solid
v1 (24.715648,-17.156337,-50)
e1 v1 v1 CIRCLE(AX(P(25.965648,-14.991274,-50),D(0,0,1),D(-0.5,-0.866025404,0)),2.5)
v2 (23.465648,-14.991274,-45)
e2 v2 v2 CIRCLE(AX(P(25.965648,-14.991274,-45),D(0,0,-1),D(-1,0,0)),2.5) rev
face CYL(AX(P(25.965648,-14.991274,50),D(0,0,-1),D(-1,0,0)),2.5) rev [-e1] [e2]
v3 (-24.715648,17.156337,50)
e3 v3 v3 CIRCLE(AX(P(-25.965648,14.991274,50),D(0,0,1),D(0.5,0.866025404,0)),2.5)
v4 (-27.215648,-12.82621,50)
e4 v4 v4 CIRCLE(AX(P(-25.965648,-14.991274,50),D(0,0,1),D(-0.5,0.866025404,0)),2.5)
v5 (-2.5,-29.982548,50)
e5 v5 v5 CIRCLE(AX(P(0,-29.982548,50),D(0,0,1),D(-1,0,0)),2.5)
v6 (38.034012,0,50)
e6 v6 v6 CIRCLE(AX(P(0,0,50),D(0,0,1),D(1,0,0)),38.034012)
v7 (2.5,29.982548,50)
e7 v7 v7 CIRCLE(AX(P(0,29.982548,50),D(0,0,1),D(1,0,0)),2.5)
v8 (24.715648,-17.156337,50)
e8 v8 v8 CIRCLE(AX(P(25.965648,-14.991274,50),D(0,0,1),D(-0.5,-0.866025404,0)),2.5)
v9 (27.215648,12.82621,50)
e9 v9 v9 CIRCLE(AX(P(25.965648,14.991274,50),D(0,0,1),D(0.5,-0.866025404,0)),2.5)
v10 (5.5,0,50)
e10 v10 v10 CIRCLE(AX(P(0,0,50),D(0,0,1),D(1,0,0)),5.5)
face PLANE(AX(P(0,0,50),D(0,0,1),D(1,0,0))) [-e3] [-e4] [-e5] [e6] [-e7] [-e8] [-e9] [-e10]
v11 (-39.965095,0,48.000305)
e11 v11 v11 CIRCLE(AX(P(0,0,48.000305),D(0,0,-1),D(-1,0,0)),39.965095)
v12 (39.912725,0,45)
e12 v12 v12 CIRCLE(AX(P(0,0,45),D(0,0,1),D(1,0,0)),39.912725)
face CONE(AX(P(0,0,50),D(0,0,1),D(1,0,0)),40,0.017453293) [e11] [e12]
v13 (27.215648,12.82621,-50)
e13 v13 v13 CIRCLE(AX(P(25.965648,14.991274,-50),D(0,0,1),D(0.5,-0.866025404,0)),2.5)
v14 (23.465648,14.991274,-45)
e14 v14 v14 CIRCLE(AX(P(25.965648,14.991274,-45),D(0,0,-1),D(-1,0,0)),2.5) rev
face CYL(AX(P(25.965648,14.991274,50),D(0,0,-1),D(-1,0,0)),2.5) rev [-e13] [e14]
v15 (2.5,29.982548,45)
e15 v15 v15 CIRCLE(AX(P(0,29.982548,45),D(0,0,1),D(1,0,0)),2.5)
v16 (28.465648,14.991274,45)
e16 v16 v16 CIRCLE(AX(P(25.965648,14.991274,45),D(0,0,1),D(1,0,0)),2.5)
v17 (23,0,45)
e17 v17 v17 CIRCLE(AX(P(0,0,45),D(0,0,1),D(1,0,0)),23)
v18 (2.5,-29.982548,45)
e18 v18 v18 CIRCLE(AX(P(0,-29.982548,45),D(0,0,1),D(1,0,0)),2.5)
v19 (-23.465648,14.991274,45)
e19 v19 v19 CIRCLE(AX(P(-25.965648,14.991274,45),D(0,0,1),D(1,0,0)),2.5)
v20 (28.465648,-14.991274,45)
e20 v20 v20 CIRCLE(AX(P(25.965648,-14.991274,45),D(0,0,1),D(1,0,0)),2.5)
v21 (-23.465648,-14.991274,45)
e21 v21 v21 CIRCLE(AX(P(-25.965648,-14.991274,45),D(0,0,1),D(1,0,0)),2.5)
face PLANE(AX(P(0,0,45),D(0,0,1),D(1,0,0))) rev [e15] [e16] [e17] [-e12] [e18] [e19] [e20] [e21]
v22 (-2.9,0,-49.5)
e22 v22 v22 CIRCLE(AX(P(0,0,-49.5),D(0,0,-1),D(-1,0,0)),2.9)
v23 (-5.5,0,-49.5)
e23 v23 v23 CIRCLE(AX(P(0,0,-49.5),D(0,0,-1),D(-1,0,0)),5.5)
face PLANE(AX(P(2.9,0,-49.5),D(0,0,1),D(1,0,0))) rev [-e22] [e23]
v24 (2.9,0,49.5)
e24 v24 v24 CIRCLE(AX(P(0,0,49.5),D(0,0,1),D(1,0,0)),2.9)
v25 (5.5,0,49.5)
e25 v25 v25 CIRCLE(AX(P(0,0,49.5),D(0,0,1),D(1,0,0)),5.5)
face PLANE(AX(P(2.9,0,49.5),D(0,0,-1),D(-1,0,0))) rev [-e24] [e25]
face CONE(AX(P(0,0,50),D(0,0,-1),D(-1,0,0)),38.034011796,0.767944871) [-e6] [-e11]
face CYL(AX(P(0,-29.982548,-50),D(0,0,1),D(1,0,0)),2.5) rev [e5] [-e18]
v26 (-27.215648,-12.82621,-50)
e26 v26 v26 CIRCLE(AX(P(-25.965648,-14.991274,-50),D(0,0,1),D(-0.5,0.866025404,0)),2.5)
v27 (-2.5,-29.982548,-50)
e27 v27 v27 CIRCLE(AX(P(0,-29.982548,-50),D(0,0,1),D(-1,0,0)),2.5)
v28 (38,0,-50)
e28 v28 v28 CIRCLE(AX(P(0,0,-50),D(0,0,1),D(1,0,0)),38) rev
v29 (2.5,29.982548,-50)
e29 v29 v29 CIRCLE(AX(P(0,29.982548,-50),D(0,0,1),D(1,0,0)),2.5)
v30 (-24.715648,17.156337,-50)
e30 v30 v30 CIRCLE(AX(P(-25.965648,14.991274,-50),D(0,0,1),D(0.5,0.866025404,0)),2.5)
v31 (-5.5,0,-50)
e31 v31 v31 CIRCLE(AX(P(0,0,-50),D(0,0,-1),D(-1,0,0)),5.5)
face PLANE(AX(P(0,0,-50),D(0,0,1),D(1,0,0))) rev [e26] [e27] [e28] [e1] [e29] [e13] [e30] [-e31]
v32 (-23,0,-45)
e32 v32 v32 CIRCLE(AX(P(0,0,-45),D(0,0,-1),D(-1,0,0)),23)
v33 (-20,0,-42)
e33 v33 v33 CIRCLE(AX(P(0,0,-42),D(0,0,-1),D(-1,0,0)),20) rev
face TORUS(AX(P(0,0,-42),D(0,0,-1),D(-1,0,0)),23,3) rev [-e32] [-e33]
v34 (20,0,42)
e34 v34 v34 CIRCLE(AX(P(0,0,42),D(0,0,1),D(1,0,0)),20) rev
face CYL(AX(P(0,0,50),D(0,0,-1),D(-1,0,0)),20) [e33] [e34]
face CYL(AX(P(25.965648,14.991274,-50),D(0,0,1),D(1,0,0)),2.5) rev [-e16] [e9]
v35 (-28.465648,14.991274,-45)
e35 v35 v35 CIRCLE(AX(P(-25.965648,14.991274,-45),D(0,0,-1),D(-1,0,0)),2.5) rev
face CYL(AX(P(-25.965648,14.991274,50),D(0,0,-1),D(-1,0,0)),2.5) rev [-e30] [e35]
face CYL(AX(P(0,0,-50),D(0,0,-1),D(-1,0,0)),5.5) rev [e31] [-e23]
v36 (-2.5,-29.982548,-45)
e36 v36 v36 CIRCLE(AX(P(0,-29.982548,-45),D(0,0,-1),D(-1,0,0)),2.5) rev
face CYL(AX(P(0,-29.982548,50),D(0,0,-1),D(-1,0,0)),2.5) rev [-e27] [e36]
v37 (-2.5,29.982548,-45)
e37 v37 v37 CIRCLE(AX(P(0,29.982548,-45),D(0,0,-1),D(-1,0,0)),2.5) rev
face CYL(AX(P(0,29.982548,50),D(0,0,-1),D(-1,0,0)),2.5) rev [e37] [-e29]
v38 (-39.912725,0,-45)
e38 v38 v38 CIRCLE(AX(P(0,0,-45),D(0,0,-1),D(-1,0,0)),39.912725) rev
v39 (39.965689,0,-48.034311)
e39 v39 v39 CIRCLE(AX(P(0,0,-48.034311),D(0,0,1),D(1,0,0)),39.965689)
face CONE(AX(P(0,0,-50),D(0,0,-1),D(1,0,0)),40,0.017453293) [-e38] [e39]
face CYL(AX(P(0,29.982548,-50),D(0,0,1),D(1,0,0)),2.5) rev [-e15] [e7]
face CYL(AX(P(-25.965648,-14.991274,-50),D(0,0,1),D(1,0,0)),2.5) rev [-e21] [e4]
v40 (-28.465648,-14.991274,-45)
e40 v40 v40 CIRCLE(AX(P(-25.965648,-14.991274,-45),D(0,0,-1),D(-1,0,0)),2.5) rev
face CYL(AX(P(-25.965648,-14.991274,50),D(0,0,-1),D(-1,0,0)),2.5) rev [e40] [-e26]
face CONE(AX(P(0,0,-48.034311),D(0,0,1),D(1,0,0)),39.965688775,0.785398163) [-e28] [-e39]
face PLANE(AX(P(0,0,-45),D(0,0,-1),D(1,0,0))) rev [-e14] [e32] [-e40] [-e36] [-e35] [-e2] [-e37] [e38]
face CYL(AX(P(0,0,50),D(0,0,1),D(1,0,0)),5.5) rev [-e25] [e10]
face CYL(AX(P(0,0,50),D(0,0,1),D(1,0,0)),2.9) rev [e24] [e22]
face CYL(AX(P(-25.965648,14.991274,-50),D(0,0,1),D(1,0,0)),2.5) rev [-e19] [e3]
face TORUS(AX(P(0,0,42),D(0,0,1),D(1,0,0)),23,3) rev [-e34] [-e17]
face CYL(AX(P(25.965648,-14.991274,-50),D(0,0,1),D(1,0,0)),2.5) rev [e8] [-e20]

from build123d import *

# Parameters (mm, degrees)
SKETCH1_R                               = 20
BOSS_EXTRUDE1_DEPTH                     = 50
SKETCH2_R                               = 40
BOSS_EXTRUDE2_DEPTH                     = 5
BOSS_EXTRUDE2_DRAFT                     = -1
CHAMFER1_SIZE                           = 2
CHAMFER1_SIZE2                          = 1.965988204
SKETCH3_R                               = 2.5
CUT_EXTRUDE1_DEPTH                      = 115.866956374
CIRPATTERN1_COUNT                       = 6
FILLET1_R                               = 3
CBORE_FOR_M5_HEX_HEAD_BOLT1_D           = 5.8
CBORE_FOR_M5_HEX_HEAD_BOLT1_CBORE_D     = 11
CBORE_FOR_M5_HEX_HEAD_BOLT1_CBORE_DEPTH = 0.5
MIRROR1_START                           = -50
MIRROR1_OUTLINE_R                       = 5.5
MIRROR1_DEPTH                           = 0.5
MIRROR1_3_OUTLINE_R                     = 2.5
MIRROR1_3_DEPTH                         = 5


with BuildPart() as part:
    # Sketch1 → Boss-Extrude1 (new, symmetric)
    with BuildSketch(Plane.XY):
        Circle(SKETCH1_R)
    extrude(amount=BOSS_EXTRUDE1_DEPTH, both=True)


with BuildPart() as boss_extrude2_tool:
    # Sketch2 → Boss-Extrude2 (with draft: the straight prism first)
    with BuildSketch(Plane.XY.offset(50)):
        Circle(SKETCH2_R)
    extrude(amount=-BOSS_EXTRUDE2_DEPTH)
    # Boss-Extrude2: the draft: its side faces are tilted about the plane it starts from
    boss_extrude2_sides = [boss_extrude2_tool.faces().sort_by_distance(p)[0] for p in [
        (-40, 0, 47.5),
    ]]
    draft(boss_extrude2_sides, Plane.XY.offset(50), BOSS_EXTRUDE2_DRAFT)


with BuildPart() as part_1:
    add(part.part)

    # Boss-Extrude2: add boss_extrude2_tool
    add(boss_extrude2_tool.part)

    # Chamfer1
    chamfer1_edges = [part_1.edges().sort_by_distance(p)[0] for p in [
        (-40, 0, 50),
    ]]
    chamfer1_side = [part_1.faces().sort_by_distance(p)[0] for p in [
        (-39.956362338, 0, 47.5),
    ]]
    chamfer(chamfer1_edges, length=CHAMFER1_SIZE, length2=CHAMFER1_SIZE2, reference=chamfer1_side[0])

    # Sketch3 → Cut-Extrude1 (cut, through all)
    with BuildSketch(Plane.XY.offset(50)):
        with Locations((0, 29.982547594)):
            Circle(SKETCH3_R)
    cut_extrude1 = extrude(amount=-CUT_EXTRUDE1_DEPTH, mode=Mode.SUBTRACT)

    # CirPattern1: Cut-Extrude1 ×6 about axis
    cirpattern1_axis = Axis((0, 0, 0), (0, 0, 1))
    for i in range(1, CIRPATTERN1_COUNT):
        add(cut_extrude1.rotate(cirpattern1_axis, i * 360 / CIRPATTERN1_COUNT), mode=Mode.SUBTRACT)

    # Fillet1
    fillet1_edges = [part_1.edges().sort_by_distance(p)[0] for p in [
        (-20, 0, 45),
    ]]
    fillet(fillet1_edges, radius=FILLET1_R)

    # CBORE for M5 Hex Head Bolt1 (through all)
    with Locations(Plane.XY.offset(50)):
        with Locations((0, 0)):
            CounterBoreHole(CBORE_FOR_M5_HEX_HEAD_BOLT1_D / 2, CBORE_FOR_M5_HEX_HEAD_BOLT1_CBORE_D / 2, CBORE_FOR_M5_HEX_HEAD_BOLT1_CBORE_DEPTH)

    # Mirror1: read off the stored shape, not the designer's step
    # Mirror1 outline → Mirror1 (cut)
    with BuildSketch(Plane.XY.offset(MIRROR1_START)):
        Circle(MIRROR1_OUTLINE_R)
    extrude(amount=MIRROR1_DEPTH, mode=Mode.SUBTRACT)

    # Mirror1 2 outline → Mirror1 2 (revolve)
    with BuildSketch(Plane.XZ):
        with BuildLine():
            Line((38, -50), (39.965688775, -48.034311225))
            Line((39.965688775, -48.034311225), (39.912724675, -45))
            Line((39.912724675, -45), (23, -45))
            ThreePointArc((23, -45), (20.878679656, -44.121320344), (20, -42))
            Line((20, -42), (20, -50))
            Line((20, -50), (38, -50))
        make_face()
    revolve(axis=Axis((0, 0, 0), (0, 0, 1)))

    # Mirror1 3 outline → Mirror1 3 (cut)
    with BuildSketch(Plane.XY.offset(MIRROR1_START)):
        with Locations((0, 29.982547594)):
            Circle(MIRROR1_3_OUTLINE_R)
        with Locations((25.965647886, 14.991273797)):
            Circle(MIRROR1_3_OUTLINE_R)
        with Locations((25.965647886, -14.991273797)):
            Circle(MIRROR1_3_OUTLINE_R)
        with Locations((0, -29.982547594)):
            Circle(MIRROR1_3_OUTLINE_R)
        with Locations((-25.965647886, -14.991273797)):
            Circle(MIRROR1_3_OUTLINE_R)
        with Locations((-25.965647886, 14.991273797)):
            Circle(MIRROR1_3_OUTLINE_R)
    extrude(amount=MIRROR1_3_DEPTH, mode=Mode.SUBTRACT)


solid = part_1.part
